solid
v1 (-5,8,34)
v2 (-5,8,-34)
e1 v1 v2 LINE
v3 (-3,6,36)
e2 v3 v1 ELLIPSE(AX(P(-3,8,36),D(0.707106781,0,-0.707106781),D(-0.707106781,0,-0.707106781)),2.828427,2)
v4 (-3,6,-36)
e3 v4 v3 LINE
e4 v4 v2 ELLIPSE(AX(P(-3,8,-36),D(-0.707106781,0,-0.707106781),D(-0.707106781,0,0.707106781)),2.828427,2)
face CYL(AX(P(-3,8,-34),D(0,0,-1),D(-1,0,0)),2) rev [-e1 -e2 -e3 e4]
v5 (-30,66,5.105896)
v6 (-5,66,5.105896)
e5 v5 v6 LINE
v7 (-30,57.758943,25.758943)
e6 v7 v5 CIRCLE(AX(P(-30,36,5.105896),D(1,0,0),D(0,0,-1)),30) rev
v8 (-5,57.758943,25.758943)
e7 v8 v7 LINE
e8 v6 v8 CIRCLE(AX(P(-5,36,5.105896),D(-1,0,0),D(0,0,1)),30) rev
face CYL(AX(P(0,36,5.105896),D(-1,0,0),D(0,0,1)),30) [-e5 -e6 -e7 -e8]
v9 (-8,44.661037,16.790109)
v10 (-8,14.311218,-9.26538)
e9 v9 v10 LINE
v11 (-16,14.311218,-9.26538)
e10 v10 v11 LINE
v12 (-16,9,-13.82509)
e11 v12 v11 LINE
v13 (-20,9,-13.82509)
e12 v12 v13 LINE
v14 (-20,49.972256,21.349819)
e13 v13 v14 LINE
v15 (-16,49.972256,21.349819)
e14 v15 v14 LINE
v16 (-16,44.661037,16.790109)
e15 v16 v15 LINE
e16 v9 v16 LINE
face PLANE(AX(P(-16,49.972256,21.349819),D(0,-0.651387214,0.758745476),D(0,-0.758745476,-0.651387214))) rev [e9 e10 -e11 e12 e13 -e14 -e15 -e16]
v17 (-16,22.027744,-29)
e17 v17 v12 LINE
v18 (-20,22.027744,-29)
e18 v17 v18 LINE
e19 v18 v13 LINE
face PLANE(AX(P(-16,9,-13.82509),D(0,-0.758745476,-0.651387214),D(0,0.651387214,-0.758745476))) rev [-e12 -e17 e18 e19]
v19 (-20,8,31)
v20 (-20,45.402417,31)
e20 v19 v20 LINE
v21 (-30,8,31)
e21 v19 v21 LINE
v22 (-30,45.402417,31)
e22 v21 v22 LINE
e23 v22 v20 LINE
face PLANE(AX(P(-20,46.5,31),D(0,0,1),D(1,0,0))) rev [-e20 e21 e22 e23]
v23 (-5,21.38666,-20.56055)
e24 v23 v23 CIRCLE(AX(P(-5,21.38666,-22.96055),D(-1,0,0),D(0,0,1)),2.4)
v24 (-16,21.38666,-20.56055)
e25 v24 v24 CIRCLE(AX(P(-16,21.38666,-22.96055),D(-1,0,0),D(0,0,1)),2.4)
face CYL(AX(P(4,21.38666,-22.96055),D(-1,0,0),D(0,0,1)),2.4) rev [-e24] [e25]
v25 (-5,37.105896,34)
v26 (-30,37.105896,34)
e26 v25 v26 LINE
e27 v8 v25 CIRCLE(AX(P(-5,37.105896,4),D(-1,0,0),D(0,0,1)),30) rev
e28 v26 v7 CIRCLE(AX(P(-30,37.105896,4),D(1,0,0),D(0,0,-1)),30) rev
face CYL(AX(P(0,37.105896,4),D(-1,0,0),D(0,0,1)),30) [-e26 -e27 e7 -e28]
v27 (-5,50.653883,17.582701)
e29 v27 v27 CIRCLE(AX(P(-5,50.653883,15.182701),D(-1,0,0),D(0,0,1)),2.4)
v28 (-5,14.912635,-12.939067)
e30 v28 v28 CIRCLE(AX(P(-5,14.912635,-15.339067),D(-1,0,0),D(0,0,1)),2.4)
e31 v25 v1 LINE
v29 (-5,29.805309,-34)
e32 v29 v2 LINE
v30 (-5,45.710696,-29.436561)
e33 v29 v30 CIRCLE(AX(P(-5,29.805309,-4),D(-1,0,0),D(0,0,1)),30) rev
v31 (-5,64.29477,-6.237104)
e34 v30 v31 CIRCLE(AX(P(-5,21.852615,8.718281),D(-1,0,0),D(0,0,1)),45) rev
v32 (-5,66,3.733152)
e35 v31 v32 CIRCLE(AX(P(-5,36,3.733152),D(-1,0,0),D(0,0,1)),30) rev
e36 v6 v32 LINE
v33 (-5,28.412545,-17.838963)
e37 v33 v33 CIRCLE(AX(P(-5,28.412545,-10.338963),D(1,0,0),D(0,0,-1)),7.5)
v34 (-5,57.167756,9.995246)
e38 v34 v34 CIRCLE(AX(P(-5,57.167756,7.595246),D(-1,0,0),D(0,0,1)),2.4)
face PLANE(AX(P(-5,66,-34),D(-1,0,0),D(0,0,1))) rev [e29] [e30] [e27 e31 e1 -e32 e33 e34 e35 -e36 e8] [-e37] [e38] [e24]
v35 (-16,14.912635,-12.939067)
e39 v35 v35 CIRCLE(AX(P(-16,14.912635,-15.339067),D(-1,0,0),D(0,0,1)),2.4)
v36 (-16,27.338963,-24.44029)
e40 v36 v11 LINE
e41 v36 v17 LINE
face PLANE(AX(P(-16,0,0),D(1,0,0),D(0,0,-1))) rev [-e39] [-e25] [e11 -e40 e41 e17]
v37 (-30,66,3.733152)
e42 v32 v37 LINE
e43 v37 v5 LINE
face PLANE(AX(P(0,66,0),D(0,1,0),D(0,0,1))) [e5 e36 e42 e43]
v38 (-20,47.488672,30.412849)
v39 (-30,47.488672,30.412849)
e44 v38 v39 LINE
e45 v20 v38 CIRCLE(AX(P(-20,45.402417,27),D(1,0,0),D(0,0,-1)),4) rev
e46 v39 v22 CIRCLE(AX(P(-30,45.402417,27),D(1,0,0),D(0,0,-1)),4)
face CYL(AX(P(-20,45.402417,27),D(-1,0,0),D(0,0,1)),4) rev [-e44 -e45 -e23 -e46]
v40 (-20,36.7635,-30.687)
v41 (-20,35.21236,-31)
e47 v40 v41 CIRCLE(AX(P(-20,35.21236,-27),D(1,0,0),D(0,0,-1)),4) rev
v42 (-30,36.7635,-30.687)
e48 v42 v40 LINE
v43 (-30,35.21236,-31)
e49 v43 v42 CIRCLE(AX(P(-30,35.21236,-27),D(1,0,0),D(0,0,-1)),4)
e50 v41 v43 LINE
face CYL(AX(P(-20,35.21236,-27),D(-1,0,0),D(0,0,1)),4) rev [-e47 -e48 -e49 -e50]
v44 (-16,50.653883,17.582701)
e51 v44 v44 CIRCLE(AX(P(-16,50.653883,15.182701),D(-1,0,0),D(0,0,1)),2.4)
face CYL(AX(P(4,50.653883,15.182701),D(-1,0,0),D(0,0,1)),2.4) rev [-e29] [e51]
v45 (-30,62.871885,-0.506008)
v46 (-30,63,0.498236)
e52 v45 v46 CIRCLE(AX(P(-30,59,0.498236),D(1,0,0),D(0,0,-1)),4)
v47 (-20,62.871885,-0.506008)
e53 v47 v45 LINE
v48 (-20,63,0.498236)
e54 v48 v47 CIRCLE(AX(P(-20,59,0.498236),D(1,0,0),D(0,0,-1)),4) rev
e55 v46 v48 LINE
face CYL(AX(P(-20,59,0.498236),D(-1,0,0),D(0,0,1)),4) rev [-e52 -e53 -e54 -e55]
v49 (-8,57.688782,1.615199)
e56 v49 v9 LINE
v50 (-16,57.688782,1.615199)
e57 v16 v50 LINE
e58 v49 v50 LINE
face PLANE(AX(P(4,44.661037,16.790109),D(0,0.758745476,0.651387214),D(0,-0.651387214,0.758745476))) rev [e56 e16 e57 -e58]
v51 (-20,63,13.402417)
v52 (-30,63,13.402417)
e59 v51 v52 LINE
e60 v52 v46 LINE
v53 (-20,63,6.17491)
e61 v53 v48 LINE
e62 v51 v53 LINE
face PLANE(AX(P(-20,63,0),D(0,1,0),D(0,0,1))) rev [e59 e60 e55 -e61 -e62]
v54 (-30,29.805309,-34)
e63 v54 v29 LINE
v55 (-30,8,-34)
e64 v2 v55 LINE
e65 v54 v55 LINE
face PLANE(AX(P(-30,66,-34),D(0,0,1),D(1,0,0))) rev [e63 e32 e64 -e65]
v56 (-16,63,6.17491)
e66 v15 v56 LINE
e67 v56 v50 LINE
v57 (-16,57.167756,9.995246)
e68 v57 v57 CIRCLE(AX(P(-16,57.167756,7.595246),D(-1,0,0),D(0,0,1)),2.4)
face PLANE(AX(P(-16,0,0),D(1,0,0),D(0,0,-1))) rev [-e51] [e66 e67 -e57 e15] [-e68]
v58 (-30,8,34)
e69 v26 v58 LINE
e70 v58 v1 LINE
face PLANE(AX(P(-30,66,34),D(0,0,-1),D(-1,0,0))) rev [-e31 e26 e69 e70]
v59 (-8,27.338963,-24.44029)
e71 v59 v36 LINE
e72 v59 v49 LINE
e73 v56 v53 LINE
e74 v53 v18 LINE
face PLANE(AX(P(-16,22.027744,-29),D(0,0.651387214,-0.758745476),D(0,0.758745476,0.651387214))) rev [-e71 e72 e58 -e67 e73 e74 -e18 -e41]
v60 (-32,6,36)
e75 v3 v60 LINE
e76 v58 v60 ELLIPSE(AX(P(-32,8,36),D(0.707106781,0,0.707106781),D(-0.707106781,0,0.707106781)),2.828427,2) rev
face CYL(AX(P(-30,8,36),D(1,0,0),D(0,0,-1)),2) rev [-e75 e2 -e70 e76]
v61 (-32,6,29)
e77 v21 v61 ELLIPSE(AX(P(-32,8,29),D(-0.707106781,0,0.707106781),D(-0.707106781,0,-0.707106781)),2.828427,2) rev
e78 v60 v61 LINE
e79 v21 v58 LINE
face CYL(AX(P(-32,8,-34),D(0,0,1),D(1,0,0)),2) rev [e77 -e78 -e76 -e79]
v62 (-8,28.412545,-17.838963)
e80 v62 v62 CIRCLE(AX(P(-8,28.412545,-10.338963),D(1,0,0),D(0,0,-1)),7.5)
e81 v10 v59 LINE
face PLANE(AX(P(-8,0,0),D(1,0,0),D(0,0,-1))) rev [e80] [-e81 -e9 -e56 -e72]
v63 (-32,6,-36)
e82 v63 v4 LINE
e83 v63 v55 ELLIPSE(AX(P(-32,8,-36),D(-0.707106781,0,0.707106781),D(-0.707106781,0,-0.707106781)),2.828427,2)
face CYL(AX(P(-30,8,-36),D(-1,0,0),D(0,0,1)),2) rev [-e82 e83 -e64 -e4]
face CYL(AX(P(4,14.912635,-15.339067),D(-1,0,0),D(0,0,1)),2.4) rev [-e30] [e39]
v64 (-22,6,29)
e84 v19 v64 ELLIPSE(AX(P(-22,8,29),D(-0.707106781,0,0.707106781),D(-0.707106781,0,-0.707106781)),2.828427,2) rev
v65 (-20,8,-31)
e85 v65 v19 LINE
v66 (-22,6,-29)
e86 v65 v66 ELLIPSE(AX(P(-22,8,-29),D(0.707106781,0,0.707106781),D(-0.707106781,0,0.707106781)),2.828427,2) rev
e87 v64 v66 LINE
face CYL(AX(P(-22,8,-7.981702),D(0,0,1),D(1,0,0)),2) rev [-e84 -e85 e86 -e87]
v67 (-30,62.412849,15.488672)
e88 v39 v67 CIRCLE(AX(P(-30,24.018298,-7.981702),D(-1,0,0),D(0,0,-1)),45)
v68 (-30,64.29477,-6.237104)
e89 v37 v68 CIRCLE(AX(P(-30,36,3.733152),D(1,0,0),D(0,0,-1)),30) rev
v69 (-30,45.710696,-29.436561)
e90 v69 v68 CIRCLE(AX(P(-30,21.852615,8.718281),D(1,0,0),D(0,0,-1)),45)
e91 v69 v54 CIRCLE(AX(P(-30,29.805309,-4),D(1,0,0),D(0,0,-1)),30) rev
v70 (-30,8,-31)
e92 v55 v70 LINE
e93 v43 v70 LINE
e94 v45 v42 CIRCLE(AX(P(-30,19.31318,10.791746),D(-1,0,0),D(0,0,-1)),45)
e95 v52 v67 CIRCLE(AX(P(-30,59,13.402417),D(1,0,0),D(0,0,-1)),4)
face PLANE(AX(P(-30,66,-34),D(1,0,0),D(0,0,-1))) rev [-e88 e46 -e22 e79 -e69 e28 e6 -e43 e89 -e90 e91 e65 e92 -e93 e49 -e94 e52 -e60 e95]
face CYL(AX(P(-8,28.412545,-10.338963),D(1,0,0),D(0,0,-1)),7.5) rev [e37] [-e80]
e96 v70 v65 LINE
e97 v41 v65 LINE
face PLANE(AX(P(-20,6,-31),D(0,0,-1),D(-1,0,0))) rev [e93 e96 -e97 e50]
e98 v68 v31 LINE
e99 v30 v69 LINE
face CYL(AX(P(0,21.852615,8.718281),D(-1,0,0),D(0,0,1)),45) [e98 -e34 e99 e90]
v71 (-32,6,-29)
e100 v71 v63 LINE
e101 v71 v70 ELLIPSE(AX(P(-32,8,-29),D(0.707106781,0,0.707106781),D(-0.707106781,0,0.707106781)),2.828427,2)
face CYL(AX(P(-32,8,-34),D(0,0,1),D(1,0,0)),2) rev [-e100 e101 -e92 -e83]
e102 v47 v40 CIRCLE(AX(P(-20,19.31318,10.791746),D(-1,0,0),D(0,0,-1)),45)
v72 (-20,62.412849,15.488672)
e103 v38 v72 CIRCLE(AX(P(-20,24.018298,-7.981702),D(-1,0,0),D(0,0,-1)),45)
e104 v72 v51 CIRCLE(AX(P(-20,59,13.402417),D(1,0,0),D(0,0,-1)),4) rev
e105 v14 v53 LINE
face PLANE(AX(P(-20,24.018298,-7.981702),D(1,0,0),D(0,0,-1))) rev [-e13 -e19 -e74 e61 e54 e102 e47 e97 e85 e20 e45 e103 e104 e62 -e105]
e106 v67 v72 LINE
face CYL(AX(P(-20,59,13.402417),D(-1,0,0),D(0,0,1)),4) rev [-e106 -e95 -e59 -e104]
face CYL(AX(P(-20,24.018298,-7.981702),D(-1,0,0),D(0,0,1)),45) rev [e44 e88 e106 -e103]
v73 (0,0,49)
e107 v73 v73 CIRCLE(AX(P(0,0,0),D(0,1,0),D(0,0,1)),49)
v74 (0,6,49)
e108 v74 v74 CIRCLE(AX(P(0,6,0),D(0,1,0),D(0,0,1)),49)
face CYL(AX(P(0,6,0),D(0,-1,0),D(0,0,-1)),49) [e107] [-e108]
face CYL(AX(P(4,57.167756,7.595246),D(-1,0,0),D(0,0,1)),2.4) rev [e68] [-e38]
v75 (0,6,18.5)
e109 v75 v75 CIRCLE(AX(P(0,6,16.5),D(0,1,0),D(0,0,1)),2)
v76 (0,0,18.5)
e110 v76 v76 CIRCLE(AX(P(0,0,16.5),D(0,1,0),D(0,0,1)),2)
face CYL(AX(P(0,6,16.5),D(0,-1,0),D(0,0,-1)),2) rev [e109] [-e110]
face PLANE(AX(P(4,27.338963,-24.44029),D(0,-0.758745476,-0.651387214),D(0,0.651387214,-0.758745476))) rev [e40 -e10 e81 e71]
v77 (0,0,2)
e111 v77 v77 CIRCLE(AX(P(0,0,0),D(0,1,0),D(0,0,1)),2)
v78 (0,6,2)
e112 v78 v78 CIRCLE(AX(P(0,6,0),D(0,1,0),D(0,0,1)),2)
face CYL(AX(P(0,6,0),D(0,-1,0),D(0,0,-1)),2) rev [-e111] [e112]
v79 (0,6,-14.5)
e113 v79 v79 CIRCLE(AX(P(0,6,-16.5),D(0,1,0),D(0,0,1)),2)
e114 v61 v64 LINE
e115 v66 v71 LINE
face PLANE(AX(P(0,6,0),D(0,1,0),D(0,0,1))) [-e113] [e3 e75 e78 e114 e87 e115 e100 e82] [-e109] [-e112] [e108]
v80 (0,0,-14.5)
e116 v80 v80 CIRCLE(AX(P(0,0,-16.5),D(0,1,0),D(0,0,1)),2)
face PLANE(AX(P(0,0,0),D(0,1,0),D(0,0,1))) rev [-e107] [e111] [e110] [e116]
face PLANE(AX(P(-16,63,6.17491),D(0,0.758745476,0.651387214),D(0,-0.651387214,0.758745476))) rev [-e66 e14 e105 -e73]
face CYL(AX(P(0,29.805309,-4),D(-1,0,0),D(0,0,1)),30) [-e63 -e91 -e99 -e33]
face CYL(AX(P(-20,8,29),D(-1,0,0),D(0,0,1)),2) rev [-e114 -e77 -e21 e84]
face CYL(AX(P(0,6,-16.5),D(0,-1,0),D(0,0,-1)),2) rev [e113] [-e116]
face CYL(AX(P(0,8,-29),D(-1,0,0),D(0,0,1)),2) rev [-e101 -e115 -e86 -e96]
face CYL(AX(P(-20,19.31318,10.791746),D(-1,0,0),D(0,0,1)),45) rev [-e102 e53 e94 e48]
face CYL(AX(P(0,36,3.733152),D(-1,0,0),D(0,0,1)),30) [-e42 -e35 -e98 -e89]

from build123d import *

# Parameters (mm, degrees)
SKETCH1_R           = 49
SKETCH1_R_2         = 2
BOSS_EXTRUDE1_DEPTH = 6
SKETCH3_W           = 25
SKETCH3_H           = 68
BOSS_EXTRUDE2_DEPTH = 60
CUT_EXTRUDE1_DEPTH  = 14
SKETCH5_R           = 2.4
CUT_EXTRUDE2_DEPTH  = 20
CUT_EXTRUDE3_DEPTH  = 30
CUT_EXTRUDE5_DEPTH  = 10
SKETCH13_R          = 7.5
BOSS_EXTRUDE3_DEPTH = 3
FILLET2_R           = 30
FILLET3_R           = 2
FILLET4_R           = 4


with BuildPart() as part:
    # Sketch1 → Boss-Extrude1 (new body)
    with BuildSketch(Plane(origin=(0, 0, 0), x_dir=(1, 0, 0), z_dir=(0, 1, 0))):
        with Locations(Location((0, 0, 0), (0, 0, 270))):
            Circle(SKETCH1_R)
        with Locations(Location((0, 16.5, 0), (0, 0, 270))):
            Circle(SKETCH1_R_2, mode=Mode.SUBTRACT)
        with Locations(Location((0, -16.5, 0), (0, 0, 270))):
            Circle(SKETCH1_R_2, mode=Mode.SUBTRACT)
        with Locations(Location((0, 0, 0), (0, 0, 270))):
            Circle(SKETCH1_R_2, mode=Mode.SUBTRACT)
    extrude(amount=BOSS_EXTRUDE1_DEPTH)

    # Sketch3 → Boss-Extrude2 (add)
    with BuildSketch(Plane(origin=(0, 6, 0), x_dir=(1, 0, 0), z_dir=(0, 1, 0))):
        with Locations((-17.5, 0)):
            Rectangle(SKETCH3_W, SKETCH3_H)
    extrude(amount=BOSS_EXTRUDE2_DEPTH)

    # Sketch4 → Cut-Extrude1 (cut)
    with BuildSketch(Plane.ZY.offset(30)):
        Polygon((-13.82509047, 9), (-29, 22.02774427), (6.17490953, 63), (21.349819059, 49.97225573), align=None)
    extrude(amount=-CUT_EXTRUDE1_DEPTH, mode=Mode.SUBTRACT)

    # Sketch5 → Cut-Extrude2 (cut)
    with BuildSketch(Plane.ZY.offset(16)):
        with Locations((-22.960549625, 21.386659614)):
            Circle(SKETCH5_R)
        with Locations((-15.33906677, 14.912634661)):
            Circle(SKETCH5_R)
        with Locations((7.595246131, 57.167755541)):
            Circle(SKETCH5_R)
        with Locations((15.182700896, 50.653883406)):
            Circle(SKETCH5_R)
        Polygon((-24.440289505, 27.338962606), (-9.265379976, 14.311218335), (16.790108565, 44.661037394), (1.615199035, 57.688781665), align=None)
    extrude(amount=-CUT_EXTRUDE2_DEPTH, mode=Mode.SUBTRACT)

    # Sketch8 → Cut-Extrude3 (cut)
    with BuildSketch(Plane.ZY.offset(30)):
        with BuildLine():
            Line((-34, 36), (-34, 66))
            Line((-34, 66), (0, 66))
            ThreePointArc((0, 66), (-21.05469299, 55.595318722), (-34, 36))
        make_face()
        with BuildLine():
            Line((14.5, 66), (34, 66))
            Line((34, 66), (34, 46.5))
            ThreePointArc((34, 46.5), (25.780574394, 57.780574394), (14.5, 66))
        make_face()
    extrude(amount=-CUT_EXTRUDE3_DEPTH, mode=Mode.SUBTRACT)

    # Sketch12 → Cut-Extrude5 (cut)
    with BuildSketch(Plane.ZY.offset(30)):
        with BuildLine():
            Line((-31, 6), (-31, 36))
            ThreePointArc((-31, 36), (-18.763387337, 53.246852127), (0, 63))
            Line((0, 63), (14.5, 63))
            ThreePointArc((14.5, 63), (23.838103281, 55.838103281), (31, 46.5))
            Line((31, 46.5), (31, 6))
            Line((31, 6), (-31, 6))
        make_face()
    extrude(amount=-CUT_EXTRUDE5_DEPTH, mode=Mode.SUBTRACT)

    # Sketch13 → Boss-Extrude3 (add)
    with BuildSketch(Plane(origin=(-5, 0, 0), x_dir=(0, 0, -1), z_dir=(1, 0, 0))):
        Polygon((-1.615199035, 57.688781665), (-16.790108565, 44.661037394), (9.265379976, 14.311218335), (24.440289505, 27.338962606), align=None)
        with Locations((10.338962606, 28.412545235)):
            Circle(SKETCH13_R, mode=Mode.SUBTRACT)
    extrude(amount=-BOSS_EXTRUDE3_DEPTH)

    # Fillet2
    # the kernel refuses this fillet: 30 mm, written as the material it takes off along each edge
    with BuildSketch(Plane(origin=(-70.677664467, 46.5, 34), x_dir=(0, -1, 0), z_dir=(1, 0, 0))) as fillet2_piece_1:
        with BuildLine():
            CenterArc((9.394104212, 30), FILLET2_R, 222.011677285, 47.988322715)
            ThreePointArc((-12.896148883, 9.921538481), (-6.900227571, 4.373054534), (0, 0))
            Line((0, 0), (9.394104212, 0))
        make_face()
    extrude(amount=106.355328934, mode=Mode.SUBTRACT)
    with BuildSketch(Plane(origin=(-70.677664467, 66, 14.5), x_dir=(0, -0.6097657406745188, 0.7925816938963802), z_dir=(1, 0, 0))) as fillet2_piece_2:
        with BuildLine():
            CenterArc((10.847377191, 29.50565373), FILLET2_R, 232.427433582, 47.988322715)
            Line((-7.445595029, 5.728202913), (0, 0))
            ThreePointArc((0, 0), (8.135532893, -0.741519405), (16.271065787, 0))
        make_face()
    extrude(amount=106.355328934, mode=Mode.SUBTRACT)
    with BuildSketch(Plane(origin=(-46.165023977, 66, 0), x_dir=(0, 0, 1), z_dir=(1, 0, 0))) as fillet2_piece_3:
        with BuildLine():
            CenterArc((3.733152378, 30), FILLET2_R, 250.589019729, 19.410980271)
            ThreePointArc((-6.237104224, 1.705230461), (-3.149219616, 0.740444809), (0, 0))
            Line((0, 0), (3.733152378, 0))
        make_face()
    extrude(amount=57.330047955, mode=Mode.SUBTRACT)
    with BuildSketch(Plane(origin=(-56.823799316, 36, -34), x_dir=(0, -1, 0), z_dir=(1, 0, 0))) as fillet2_piece_4:
        with BuildLine():
            CenterArc((6.194691102, -30), FILLET2_R, 90, 32.01758898)
            ThreePointArc((-9.710696233, -4.563438642), (-4.991844582, -1.99126385), (0, 0))
            Line((0, 0), (6.194691102, 0))
        make_face()
    extrude(amount=78.647598632, mode=Mode.SUBTRACT)

    # Fillet3
    fillet3_edges = [part.edges().sort_by_distance(p)[0] for p in [
        (-30, 6, 32.5),
        (-20, 6, 0),
        (-25, 6, 31),
        (-25, 6, -31),
        (-30, 6, -32.5),
        (-17.5, 6, 34),
        (-5, 6, 0),
        (-17.5, 6, -34),
    ]]
    fillet(fillet3_edges, radius=FILLET3_R)

    # Fillet4
    fillet4_edges = [part.edges().sort_by_distance(p)[0] for p in [
        (-25, 36, -31),
        (-25, 63, 0),
        (-25, 63, 14.5),
        (-25, 46.5, 31),
    ]]
    fillet(fillet4_edges, radius=FILLET4_R)


solid = part.part
